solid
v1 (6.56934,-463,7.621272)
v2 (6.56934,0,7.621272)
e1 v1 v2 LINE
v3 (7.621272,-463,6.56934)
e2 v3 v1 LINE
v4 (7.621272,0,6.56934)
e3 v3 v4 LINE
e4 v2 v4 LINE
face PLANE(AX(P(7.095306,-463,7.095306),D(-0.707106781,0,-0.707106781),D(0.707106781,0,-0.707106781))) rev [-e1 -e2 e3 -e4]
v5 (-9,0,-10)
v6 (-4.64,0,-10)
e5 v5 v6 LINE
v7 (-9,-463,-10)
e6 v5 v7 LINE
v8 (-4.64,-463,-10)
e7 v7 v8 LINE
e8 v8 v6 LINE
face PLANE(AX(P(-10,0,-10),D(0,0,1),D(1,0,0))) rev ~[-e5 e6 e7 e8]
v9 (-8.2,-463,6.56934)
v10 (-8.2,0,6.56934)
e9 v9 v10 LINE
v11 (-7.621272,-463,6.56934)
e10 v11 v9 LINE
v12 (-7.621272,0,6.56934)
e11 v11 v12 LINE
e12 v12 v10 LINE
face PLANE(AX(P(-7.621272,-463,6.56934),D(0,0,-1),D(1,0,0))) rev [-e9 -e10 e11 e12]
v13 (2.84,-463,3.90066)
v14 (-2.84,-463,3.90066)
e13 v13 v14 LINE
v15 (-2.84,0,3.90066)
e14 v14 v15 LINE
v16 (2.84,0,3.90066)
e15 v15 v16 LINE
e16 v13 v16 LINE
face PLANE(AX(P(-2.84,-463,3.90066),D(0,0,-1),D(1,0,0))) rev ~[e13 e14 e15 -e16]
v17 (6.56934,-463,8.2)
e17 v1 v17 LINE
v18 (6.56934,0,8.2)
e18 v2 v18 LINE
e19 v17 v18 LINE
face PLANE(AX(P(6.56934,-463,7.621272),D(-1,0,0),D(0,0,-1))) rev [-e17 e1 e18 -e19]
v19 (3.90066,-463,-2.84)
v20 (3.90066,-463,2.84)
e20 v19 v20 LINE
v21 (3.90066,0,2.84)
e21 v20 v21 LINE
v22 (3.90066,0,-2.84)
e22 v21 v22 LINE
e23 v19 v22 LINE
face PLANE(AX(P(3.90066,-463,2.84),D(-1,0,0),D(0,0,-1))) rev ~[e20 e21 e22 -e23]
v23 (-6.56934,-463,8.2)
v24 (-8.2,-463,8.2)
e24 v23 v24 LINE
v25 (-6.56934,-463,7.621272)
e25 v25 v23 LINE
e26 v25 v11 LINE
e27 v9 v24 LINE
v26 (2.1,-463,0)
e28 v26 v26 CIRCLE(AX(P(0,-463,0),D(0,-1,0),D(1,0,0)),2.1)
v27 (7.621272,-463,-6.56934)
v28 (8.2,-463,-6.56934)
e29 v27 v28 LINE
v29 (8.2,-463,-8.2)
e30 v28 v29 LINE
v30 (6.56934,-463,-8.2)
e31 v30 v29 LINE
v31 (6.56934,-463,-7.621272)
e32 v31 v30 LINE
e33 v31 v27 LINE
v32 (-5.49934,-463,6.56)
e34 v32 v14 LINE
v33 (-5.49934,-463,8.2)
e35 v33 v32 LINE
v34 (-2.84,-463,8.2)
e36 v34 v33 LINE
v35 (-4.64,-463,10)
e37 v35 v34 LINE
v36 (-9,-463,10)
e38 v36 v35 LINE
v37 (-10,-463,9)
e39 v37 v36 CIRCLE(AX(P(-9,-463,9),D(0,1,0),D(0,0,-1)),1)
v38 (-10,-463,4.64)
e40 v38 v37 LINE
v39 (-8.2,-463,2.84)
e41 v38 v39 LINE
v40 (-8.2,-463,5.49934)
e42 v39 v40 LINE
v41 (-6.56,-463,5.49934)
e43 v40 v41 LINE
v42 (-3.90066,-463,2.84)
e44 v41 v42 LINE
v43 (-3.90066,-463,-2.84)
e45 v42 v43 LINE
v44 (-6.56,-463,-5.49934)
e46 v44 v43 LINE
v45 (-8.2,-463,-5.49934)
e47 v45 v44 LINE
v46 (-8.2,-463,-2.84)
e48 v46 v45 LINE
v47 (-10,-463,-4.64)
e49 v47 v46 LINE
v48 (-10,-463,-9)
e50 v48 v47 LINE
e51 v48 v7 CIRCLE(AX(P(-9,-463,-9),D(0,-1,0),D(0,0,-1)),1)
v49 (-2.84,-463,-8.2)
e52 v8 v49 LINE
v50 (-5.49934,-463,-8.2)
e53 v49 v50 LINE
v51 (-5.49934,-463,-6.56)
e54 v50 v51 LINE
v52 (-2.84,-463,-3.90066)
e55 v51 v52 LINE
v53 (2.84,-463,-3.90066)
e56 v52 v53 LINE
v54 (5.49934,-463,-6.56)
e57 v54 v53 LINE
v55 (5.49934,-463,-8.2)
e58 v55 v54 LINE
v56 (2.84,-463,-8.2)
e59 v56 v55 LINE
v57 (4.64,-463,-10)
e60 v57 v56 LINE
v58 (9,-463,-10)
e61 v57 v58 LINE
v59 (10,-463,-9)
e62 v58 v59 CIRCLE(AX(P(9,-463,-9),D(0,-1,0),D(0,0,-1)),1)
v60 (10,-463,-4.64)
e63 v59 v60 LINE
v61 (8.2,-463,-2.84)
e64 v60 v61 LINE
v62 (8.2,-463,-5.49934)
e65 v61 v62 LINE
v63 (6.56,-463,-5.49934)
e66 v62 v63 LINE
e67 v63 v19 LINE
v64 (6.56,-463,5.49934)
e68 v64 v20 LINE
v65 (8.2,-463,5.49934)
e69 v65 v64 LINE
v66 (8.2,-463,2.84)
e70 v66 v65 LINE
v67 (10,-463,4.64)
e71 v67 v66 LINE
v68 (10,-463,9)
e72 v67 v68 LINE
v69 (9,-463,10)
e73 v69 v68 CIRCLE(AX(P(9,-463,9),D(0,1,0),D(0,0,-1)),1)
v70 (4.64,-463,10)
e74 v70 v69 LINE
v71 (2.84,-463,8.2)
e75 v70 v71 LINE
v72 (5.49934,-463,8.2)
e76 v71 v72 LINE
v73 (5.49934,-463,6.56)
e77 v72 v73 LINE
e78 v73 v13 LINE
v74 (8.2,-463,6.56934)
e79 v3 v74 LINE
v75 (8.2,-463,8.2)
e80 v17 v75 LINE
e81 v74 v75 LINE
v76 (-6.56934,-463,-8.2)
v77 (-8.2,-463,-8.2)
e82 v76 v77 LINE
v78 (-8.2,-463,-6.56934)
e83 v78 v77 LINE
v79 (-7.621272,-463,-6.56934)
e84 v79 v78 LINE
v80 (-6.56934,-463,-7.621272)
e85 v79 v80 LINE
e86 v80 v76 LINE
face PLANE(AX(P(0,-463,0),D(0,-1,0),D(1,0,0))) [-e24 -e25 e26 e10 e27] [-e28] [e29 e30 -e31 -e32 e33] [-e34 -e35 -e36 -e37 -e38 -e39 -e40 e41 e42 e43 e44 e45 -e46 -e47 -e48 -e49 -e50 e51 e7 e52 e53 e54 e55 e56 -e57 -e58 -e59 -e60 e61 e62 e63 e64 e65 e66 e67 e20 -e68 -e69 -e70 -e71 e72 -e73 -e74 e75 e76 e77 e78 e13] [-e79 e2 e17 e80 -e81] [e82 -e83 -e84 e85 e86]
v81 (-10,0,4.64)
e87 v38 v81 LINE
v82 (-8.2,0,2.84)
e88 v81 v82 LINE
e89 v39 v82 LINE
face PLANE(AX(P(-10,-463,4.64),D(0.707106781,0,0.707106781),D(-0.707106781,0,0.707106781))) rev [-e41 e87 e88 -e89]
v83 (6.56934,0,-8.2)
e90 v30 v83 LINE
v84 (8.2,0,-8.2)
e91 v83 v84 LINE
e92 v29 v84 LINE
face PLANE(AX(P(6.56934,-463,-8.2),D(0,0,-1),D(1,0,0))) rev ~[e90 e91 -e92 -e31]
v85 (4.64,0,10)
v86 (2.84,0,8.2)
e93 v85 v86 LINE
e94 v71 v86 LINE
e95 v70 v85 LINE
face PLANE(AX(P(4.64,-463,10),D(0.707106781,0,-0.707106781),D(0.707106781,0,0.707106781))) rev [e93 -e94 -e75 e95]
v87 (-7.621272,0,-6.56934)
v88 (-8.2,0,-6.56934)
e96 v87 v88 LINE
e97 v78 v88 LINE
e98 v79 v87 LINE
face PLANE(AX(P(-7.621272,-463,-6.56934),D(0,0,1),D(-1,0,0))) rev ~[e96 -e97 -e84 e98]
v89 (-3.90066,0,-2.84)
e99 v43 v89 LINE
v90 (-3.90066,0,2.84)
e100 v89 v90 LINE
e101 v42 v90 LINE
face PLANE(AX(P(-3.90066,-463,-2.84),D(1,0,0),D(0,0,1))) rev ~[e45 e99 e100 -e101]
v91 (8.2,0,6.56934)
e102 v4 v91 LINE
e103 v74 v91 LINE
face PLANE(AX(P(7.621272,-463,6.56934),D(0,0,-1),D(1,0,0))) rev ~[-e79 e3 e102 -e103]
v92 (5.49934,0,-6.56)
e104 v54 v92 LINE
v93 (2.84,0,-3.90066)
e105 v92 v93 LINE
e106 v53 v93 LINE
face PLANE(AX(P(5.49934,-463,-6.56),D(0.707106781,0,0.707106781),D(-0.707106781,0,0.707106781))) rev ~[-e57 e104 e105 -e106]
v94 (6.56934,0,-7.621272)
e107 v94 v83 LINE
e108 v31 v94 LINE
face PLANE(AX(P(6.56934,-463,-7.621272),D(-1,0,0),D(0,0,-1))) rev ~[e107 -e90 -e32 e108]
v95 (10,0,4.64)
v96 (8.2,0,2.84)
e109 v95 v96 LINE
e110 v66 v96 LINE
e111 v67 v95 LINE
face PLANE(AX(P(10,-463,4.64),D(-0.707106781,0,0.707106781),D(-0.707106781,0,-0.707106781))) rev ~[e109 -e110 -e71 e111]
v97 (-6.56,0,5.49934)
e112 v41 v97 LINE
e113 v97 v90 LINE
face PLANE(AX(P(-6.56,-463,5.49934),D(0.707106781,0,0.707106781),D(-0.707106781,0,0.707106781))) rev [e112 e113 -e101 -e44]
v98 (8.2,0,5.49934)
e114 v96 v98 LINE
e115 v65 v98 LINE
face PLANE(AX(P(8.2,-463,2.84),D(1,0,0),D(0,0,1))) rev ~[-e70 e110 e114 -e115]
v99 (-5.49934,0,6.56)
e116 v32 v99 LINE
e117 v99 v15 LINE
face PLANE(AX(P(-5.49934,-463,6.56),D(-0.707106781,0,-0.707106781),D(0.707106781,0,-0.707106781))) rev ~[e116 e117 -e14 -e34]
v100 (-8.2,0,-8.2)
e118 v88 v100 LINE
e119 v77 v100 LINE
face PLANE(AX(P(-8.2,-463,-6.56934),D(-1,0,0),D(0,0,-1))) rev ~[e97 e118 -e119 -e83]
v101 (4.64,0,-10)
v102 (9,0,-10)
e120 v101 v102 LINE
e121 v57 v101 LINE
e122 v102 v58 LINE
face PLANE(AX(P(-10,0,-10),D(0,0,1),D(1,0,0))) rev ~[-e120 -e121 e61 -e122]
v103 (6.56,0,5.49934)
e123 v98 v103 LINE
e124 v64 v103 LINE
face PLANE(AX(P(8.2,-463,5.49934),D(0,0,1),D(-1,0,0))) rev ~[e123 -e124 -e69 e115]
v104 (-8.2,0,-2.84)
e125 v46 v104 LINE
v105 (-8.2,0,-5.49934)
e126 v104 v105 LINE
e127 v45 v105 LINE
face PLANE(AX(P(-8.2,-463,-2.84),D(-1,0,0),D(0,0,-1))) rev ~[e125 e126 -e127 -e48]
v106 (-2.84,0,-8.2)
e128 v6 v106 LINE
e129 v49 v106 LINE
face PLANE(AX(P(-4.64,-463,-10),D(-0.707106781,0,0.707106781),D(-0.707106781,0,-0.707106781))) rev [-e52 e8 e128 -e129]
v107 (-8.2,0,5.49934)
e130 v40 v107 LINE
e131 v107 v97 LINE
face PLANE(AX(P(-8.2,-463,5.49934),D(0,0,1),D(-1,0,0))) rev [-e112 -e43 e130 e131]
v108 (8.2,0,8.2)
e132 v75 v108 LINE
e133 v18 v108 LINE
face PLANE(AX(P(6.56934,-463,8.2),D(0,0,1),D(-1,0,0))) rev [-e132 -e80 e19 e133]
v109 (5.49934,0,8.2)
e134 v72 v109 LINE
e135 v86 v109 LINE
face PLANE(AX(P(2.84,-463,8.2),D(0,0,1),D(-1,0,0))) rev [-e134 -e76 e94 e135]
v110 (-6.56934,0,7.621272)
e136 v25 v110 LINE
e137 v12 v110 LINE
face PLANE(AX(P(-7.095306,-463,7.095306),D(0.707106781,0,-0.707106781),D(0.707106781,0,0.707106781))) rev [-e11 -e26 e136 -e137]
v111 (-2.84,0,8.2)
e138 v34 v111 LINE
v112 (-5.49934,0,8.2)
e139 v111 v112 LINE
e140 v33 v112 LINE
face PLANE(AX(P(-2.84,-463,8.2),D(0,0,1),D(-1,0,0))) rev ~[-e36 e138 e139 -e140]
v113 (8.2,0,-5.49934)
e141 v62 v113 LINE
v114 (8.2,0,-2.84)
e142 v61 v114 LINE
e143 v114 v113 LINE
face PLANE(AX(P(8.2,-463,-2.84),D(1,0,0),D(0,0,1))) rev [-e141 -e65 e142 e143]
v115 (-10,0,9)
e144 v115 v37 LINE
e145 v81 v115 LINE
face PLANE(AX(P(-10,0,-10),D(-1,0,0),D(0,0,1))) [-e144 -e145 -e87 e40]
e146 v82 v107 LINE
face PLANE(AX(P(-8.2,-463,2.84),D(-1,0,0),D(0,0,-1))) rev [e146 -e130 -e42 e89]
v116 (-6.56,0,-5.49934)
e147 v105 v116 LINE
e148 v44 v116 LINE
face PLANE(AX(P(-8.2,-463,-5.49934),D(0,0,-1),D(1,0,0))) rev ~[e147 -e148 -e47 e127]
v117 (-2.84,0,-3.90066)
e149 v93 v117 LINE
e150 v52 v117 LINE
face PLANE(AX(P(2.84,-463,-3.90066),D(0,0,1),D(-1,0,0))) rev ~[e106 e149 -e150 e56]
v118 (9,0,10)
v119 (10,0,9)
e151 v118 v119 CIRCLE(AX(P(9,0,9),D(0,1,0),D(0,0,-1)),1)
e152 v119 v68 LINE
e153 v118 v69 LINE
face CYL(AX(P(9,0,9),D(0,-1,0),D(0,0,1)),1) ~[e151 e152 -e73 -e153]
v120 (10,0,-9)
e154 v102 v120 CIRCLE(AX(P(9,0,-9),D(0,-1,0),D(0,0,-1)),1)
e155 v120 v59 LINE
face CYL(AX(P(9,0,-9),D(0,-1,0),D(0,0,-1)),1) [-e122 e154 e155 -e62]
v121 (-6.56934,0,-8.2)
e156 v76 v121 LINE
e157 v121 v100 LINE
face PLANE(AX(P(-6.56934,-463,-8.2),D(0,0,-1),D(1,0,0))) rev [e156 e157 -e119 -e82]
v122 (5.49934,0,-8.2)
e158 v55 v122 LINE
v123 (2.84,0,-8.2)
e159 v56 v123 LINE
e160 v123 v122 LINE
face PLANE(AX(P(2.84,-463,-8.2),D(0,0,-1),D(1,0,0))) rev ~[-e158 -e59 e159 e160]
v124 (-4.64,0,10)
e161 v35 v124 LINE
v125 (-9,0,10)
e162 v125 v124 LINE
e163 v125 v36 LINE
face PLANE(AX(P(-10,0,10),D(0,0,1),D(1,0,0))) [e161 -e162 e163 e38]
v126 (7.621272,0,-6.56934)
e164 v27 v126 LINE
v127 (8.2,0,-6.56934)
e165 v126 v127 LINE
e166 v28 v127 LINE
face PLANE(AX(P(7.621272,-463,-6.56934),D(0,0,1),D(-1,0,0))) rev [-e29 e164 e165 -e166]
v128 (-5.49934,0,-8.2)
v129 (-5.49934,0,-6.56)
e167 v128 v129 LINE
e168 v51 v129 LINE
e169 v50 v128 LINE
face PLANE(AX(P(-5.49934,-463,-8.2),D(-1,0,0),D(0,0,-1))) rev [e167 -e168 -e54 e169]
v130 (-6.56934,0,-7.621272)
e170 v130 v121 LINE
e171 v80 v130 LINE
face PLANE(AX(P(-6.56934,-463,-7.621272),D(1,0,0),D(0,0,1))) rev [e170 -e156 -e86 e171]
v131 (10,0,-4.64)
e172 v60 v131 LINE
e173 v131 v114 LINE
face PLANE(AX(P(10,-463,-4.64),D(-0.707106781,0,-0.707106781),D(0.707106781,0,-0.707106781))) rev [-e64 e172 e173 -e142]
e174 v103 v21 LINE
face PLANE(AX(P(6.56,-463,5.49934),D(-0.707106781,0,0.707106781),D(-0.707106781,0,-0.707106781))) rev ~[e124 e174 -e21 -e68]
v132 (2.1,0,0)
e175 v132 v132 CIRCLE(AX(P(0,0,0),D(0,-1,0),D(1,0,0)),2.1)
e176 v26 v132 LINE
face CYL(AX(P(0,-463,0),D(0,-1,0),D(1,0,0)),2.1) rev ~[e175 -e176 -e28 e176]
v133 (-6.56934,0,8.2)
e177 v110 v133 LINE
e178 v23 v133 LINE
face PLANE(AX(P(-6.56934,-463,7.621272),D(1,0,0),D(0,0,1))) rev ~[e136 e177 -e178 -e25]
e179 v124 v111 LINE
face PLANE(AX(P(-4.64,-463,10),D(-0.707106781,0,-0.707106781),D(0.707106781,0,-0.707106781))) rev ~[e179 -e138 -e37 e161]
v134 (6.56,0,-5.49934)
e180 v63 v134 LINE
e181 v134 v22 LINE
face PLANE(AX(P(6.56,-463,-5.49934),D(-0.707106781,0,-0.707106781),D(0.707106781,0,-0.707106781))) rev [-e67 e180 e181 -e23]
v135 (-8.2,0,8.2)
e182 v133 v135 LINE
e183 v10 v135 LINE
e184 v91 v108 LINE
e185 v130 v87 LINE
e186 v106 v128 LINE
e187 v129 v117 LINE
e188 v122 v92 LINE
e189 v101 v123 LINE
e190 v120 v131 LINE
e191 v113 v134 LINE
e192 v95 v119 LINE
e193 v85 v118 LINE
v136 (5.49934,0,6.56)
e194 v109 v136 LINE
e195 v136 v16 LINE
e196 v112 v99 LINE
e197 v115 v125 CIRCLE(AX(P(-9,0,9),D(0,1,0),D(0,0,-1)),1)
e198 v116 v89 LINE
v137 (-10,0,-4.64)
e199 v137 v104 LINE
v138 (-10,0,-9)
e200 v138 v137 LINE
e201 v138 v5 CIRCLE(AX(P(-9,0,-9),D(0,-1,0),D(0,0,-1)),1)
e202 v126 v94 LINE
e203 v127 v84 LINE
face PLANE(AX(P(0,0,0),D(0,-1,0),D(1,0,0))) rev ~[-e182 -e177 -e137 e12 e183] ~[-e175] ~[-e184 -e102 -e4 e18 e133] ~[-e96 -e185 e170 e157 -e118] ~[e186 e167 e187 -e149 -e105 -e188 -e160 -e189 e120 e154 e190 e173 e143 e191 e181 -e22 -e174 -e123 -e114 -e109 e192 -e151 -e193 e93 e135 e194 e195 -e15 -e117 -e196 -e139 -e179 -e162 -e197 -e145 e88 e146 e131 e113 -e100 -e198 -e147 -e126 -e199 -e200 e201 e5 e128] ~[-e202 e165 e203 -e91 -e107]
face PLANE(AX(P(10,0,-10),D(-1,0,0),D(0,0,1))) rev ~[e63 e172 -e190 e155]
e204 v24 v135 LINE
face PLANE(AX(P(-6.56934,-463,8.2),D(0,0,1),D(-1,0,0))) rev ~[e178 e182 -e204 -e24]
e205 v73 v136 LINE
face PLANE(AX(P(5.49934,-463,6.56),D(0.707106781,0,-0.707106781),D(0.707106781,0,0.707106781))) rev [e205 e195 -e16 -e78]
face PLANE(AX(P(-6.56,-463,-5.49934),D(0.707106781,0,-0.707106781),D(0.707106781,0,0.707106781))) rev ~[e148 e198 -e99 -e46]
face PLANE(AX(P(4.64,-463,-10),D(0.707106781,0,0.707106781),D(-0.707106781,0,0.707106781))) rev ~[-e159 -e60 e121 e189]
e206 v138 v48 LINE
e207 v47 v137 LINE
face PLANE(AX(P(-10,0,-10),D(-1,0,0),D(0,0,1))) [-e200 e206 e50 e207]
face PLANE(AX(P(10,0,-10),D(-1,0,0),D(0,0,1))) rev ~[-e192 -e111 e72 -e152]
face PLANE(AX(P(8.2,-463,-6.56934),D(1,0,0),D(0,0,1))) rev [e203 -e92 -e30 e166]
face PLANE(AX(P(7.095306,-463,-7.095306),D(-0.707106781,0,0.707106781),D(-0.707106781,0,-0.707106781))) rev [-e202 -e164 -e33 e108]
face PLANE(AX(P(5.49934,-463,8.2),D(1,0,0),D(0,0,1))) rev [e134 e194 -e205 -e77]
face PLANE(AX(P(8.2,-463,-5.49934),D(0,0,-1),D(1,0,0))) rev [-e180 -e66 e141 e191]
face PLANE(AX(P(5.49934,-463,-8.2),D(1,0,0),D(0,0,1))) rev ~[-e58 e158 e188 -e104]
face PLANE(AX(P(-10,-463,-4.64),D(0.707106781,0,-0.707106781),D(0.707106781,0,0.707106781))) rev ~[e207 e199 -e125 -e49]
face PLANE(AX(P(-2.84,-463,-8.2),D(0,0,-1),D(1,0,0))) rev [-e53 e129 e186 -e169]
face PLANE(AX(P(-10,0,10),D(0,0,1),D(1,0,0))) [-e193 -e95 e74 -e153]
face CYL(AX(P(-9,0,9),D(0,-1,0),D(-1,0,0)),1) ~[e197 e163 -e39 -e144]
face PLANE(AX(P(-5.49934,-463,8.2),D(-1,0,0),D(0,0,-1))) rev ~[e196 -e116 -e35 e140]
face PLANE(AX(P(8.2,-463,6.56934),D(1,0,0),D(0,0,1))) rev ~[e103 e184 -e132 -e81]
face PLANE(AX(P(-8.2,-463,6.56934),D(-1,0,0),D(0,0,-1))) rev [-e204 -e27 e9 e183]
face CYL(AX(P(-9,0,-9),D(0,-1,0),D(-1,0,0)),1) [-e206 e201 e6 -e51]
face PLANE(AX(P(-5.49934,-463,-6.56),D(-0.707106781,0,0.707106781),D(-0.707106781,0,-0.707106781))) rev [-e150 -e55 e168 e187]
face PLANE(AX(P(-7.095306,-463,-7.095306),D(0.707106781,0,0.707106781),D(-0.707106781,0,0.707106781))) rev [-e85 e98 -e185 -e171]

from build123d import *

# Parameters (mm, degrees)
F0_W            = 20
F0_H            = 20
F1_DEPTH        = 463
F2_R            = 2.1
F3_DEPTH        = 463.001
F4_R            = 1
F6_DEPTH        = 463.001
F6_COPIES_COUNT = 4


# Not quite as in the source:
# - a pattern or mirror of a feature is missing from the dataset's text; its kind, count and spacing are read off the source's solid


with BuildPart() as f1:
    # F0 (on Front) → F1 (new body)
    with BuildSketch(Plane.XZ):
        Rectangle(F0_W, F0_H)
    extrude(amount=F1_DEPTH)

    # F2 (on face) → F3 (cut, through all)
    with BuildSketch(Plane.XZ.offset(463)):
        Circle(F2_R)
    extrude(amount=-F3_DEPTH, mode=Mode.SUBTRACT)

    # F4
    f4_edges = [f1.edges().sort_by_distance(p)[0] for p in [
        (-10, -231.5, 10),
        (10, -231.5, 10),
        (10, -231.5, -10),
        (-10, -231.5, -10),
    ]]
    fillet(f4_edges, radius=F4_R)

    # F5 (on face) → F6 (cut, through all)
    with BuildSketch(Plane.XZ.offset(463)):
        Polygon((0, 3.9006601718), (0, 10), (-2.84, 10), (-4.64, 10), (-2.84, 8.2), (-5.4993398282, 8.2), (-5.4993398282, 6.56), (-2.84, 3.9006601718), align=None)
        Polygon((-6.5693398282, 8.2), (-8.2, 8.2), (-7.0953059148, 7.0953059148), (-6.5693398282, 7.6212720014), align=None)
    f6 = extrude(amount=-F6_DEPTH, mode=Mode.SUBTRACT)

    # F6_copies: F6 ×4 about axis
    f6_copies_axis = Axis((0, 0, 0), (0, 1, 0))
    for i in range(1, F6_COPIES_COUNT):
        add(f6.rotate(f6_copies_axis, i * 360 / F6_COPIES_COUNT), mode=Mode.SUBTRACT)

    # F6_copies1: F6 across plane
    add(f6.mirror(Plane(origin=(0, 0, 0), x_dir=(-0.7071067812, 0, -0.7071067812), z_dir=(0.7071067812, 0, -0.7071067812))), mode=Mode.SUBTRACT)

    # F6_copies2: F6 across plane
    add(f6.mirror(Plane(origin=(0, 0, 0), x_dir=(-1, 0, 0), z_dir=(0, 0, -1))), mode=Mode.SUBTRACT)

    # F6_copies3: F6 across plane
    add(f6.mirror(Plane(origin=(0, 0, 0), x_dir=(0, 0, 1), z_dir=(1, 0, 0))), mode=Mode.SUBTRACT)

    # F6_copies4: F6 across plane
    add(f6.mirror(Plane(origin=(0, 0, 0), x_dir=(0.7071067812, 0, -0.7071067812), z_dir=(-0.7071067812, 0, -0.7071067812))), mode=Mode.SUBTRACT)


solid = f1.part
